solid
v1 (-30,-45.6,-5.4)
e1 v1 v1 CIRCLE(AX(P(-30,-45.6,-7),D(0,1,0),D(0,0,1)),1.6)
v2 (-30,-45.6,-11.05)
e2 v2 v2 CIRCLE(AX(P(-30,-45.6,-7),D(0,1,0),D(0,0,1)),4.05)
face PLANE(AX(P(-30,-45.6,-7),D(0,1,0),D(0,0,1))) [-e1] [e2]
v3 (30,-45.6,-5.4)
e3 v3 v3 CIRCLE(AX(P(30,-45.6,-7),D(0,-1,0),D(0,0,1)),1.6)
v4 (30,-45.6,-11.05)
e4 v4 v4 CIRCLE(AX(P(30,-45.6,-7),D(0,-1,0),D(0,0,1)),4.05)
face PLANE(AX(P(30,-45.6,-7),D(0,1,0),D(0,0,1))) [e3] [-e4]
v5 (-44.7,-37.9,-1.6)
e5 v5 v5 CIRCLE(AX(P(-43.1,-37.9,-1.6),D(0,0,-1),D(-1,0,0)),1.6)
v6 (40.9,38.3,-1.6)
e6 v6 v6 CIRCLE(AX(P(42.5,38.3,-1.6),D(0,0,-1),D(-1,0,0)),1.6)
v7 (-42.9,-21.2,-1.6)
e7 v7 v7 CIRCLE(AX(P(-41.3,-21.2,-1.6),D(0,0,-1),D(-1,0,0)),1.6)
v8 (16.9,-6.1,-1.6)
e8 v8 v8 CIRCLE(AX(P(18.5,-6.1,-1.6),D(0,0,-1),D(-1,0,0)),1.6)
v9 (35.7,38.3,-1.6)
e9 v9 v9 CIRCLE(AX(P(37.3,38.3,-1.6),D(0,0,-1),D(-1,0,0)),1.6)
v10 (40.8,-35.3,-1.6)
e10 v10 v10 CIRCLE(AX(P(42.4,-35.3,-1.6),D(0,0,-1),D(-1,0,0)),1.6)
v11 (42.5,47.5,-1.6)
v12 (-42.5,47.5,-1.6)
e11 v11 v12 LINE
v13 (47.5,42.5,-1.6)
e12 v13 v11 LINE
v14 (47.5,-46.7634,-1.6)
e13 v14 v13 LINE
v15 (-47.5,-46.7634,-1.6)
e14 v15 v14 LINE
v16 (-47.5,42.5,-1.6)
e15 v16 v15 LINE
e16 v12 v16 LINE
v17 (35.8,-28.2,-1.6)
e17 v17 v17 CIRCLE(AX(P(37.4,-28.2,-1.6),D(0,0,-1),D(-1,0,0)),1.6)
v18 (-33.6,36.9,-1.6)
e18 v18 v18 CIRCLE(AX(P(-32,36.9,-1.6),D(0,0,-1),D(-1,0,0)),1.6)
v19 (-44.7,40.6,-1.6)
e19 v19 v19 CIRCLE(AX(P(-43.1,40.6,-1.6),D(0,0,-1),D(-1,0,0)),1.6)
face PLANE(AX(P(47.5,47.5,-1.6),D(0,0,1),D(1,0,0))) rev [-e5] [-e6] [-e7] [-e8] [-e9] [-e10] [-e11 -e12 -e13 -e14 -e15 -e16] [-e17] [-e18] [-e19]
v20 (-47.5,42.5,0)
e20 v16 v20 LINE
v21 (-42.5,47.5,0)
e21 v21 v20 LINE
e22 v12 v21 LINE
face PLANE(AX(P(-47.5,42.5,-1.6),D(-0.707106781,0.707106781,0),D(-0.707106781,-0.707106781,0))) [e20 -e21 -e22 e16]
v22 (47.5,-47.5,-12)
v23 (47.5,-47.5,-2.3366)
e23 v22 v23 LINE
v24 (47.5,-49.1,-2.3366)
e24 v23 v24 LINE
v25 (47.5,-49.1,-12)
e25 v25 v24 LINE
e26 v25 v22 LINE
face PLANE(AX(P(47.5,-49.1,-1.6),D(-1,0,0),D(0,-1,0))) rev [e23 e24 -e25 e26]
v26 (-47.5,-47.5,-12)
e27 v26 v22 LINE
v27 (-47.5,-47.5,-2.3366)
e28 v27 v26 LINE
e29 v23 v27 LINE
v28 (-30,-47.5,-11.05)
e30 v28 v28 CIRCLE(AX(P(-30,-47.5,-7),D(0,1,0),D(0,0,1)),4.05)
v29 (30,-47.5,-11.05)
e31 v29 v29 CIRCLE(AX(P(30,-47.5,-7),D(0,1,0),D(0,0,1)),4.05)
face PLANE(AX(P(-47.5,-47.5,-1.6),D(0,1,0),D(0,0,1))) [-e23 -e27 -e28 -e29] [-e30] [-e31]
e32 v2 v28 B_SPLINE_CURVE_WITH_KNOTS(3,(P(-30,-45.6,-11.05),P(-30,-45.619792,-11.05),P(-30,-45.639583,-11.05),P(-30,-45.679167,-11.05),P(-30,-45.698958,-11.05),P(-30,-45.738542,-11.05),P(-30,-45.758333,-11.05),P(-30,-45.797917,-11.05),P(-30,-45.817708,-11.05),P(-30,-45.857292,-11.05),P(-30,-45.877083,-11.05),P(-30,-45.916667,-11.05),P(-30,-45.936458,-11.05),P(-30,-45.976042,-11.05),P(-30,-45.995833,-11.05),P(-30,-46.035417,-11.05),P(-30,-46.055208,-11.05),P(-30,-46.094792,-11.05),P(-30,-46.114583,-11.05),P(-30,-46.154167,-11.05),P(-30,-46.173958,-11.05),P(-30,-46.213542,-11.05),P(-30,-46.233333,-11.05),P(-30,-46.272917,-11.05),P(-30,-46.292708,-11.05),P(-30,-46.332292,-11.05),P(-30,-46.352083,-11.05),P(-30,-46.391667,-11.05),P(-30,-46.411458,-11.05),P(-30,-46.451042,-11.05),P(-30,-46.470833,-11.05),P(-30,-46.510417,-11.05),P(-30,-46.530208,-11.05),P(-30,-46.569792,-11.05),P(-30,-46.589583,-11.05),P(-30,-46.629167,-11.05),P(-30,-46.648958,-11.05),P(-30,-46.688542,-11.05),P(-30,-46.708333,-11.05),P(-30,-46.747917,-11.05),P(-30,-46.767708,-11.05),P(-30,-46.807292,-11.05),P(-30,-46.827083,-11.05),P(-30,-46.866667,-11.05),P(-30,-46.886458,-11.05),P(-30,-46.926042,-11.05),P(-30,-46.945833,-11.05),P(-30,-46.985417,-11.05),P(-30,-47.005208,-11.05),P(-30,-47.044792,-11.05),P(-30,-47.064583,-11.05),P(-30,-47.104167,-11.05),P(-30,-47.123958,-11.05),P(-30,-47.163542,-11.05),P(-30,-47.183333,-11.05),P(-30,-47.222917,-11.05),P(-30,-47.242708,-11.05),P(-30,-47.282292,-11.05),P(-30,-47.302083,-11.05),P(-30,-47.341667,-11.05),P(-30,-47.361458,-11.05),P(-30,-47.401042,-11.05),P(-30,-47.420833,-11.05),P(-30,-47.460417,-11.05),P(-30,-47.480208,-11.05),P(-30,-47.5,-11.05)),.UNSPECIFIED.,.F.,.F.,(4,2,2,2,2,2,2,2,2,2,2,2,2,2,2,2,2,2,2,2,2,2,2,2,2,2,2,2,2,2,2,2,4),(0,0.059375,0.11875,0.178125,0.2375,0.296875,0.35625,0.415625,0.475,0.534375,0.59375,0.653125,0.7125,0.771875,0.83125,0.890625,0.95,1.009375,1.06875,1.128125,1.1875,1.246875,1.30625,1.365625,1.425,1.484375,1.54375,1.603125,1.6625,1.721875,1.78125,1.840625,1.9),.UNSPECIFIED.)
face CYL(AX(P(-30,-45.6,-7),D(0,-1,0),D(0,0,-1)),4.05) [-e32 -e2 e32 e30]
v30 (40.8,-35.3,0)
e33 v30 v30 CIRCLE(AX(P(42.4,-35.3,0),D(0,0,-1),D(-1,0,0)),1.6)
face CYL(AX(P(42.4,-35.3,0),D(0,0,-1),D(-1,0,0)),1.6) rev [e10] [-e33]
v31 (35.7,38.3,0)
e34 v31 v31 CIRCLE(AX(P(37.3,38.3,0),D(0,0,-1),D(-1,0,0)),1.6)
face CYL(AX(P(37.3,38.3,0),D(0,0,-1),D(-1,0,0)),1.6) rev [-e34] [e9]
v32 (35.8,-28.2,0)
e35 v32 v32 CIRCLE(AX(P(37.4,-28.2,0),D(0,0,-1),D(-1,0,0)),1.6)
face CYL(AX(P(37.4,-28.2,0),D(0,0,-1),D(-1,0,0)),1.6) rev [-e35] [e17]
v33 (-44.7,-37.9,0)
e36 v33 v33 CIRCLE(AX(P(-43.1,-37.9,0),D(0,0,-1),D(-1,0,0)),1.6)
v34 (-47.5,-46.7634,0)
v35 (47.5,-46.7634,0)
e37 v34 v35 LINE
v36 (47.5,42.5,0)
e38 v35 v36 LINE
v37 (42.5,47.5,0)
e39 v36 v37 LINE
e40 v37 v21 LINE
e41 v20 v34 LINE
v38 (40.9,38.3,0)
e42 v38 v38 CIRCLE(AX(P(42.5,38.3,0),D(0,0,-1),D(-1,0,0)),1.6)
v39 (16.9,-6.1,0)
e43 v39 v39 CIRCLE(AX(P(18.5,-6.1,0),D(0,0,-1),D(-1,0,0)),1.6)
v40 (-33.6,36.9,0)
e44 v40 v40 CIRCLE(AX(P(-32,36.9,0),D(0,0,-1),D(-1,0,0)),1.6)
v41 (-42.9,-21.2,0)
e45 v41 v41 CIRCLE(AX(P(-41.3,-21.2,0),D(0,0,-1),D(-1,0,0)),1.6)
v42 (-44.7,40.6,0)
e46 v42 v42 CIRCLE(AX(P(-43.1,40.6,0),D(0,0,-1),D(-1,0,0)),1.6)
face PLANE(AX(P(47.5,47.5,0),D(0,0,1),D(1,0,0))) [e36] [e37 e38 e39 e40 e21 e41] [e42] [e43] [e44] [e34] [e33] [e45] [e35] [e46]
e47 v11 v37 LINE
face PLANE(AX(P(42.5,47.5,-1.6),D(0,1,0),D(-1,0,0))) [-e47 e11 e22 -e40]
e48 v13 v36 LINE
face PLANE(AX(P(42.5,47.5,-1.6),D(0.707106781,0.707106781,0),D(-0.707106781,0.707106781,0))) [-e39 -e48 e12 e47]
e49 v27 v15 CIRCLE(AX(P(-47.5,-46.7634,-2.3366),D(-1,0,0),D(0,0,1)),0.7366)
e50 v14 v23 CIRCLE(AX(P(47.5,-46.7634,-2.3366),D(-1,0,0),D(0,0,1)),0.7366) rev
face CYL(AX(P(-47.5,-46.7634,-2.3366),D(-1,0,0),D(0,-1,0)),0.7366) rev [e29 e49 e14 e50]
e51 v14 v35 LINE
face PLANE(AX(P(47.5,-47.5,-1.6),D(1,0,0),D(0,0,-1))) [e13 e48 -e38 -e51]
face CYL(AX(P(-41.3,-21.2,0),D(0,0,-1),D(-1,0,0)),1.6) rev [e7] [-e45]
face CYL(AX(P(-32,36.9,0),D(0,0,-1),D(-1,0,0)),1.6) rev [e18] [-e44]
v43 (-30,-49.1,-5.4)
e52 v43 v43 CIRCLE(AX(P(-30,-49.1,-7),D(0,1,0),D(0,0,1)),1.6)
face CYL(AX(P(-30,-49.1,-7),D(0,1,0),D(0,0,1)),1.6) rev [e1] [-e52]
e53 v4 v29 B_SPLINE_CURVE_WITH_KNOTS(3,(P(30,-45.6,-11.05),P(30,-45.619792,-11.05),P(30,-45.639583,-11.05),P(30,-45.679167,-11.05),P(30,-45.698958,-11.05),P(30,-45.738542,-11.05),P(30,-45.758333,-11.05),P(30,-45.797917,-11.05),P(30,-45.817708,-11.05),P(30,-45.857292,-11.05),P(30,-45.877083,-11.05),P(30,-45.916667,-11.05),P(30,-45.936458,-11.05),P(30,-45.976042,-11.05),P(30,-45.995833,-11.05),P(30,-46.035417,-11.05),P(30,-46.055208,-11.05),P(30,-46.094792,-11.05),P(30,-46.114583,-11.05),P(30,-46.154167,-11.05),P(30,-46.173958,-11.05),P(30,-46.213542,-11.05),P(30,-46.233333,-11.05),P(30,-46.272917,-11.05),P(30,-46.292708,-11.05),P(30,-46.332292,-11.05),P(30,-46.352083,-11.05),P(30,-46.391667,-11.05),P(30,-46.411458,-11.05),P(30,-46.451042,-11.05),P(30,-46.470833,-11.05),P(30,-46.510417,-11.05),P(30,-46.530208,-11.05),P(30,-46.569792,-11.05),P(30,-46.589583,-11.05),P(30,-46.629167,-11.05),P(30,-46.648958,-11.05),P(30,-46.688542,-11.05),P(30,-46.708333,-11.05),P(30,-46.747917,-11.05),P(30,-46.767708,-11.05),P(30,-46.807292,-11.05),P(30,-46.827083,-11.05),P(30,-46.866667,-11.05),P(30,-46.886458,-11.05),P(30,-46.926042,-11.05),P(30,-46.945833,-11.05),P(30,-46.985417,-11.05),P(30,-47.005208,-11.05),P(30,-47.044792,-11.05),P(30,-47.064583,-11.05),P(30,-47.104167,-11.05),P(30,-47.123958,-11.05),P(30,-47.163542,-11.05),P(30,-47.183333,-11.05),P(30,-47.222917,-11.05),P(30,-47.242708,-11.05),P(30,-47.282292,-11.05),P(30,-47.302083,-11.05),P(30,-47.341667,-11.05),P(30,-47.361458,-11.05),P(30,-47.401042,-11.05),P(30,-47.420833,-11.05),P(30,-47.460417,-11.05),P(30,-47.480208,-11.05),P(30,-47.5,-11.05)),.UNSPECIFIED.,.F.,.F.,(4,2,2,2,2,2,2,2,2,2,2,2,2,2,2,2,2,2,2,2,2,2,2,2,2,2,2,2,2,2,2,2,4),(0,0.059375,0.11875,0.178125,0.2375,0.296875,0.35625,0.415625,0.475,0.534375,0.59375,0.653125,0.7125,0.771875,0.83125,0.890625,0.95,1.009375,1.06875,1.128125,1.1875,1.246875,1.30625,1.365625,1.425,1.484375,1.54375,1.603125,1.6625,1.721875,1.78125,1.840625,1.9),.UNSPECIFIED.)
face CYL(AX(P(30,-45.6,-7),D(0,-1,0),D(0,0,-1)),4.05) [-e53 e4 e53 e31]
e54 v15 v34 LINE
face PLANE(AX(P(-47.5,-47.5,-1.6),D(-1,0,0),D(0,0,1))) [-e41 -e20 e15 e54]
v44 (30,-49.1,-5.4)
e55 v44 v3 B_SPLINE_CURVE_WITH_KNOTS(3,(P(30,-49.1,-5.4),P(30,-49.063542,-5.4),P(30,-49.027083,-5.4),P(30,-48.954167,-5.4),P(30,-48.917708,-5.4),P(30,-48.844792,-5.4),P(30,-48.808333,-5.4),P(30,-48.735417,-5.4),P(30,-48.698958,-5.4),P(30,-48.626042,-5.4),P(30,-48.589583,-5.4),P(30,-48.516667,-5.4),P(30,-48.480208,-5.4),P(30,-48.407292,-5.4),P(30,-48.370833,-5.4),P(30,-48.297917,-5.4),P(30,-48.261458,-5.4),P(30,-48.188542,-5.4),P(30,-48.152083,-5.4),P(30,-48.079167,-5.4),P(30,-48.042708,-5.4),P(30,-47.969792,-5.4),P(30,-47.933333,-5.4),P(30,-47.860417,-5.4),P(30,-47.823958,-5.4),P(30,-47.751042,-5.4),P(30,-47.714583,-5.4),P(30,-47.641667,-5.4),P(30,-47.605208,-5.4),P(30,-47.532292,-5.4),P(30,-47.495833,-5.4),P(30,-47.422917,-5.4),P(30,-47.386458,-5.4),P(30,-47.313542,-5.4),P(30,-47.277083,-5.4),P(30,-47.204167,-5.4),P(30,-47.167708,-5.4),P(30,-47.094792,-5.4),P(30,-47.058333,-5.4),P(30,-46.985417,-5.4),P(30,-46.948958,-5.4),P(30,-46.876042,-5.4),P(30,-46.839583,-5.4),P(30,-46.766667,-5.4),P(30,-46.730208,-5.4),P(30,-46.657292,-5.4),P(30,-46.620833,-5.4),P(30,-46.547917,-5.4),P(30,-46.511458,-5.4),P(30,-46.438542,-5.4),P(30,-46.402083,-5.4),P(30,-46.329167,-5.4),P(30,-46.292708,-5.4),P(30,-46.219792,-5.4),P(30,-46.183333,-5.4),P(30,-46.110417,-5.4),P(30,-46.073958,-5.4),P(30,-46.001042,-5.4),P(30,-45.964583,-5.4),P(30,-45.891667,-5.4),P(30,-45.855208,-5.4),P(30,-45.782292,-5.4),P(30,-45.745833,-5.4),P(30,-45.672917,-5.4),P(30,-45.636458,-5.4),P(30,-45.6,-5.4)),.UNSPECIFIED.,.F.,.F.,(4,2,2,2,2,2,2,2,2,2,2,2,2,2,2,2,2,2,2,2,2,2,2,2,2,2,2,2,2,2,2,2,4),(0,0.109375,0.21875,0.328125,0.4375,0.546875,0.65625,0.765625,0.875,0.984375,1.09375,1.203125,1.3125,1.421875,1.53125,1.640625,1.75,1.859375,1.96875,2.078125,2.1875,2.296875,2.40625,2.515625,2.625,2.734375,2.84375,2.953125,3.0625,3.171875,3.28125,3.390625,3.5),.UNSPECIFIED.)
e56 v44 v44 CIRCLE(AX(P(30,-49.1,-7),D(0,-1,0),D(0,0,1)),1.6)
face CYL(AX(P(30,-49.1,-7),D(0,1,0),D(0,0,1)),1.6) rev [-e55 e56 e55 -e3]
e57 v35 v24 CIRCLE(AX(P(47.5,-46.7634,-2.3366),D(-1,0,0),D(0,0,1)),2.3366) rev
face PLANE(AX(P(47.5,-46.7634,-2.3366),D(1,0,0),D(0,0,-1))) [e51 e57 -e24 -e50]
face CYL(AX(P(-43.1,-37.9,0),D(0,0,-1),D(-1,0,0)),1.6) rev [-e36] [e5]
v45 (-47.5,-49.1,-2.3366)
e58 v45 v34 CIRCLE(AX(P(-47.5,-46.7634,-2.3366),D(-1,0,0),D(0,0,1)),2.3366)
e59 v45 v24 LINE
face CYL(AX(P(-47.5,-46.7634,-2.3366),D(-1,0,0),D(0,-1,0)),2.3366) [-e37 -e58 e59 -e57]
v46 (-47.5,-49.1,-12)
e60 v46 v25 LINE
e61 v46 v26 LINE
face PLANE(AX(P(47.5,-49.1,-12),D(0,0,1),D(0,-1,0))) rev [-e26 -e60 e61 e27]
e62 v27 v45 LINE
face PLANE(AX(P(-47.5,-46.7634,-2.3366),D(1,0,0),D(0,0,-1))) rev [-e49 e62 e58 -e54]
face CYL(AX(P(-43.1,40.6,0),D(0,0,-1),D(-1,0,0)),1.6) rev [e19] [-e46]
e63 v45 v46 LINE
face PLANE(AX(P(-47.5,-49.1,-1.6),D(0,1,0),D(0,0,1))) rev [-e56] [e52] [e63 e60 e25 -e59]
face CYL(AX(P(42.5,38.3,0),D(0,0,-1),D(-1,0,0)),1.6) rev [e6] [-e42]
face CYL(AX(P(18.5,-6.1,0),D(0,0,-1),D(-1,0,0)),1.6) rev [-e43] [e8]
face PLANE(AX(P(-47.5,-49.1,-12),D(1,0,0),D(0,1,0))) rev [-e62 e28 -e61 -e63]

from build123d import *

# Parameters (mm, degrees)
SM_BASE_FLANGE_2_DEPTH           = 1.6
SM_EDGE_FLANGE_2_STRIP_W         = 7.8732
SM_EDGE_FLANGE_2_STRIP_H         = 1.6
SM_EDGE_FLANGE_2_STRIP_CUT_DEPTH = 95
SM_EDGE_FLANGE_2_DEPTH           = 95
SKETCH_16_R                      = 4.05
EXTRUDE_1_DEPTH                  = 1.9
SKETCH_17_R                      = 1.6
CUT_EXTRUDE_1_DEPTH              = 106.203897266
SKETCH_18_R                      = 1.6
CUT_EXTRUDE_2_DEPTH              = 70.102966651


# Sheet-metal steps are written as plain solids
with BuildPart() as part:
    # 草图1 → 基体-法兰2 (new body)
    with BuildSketch(Plane.XY):
        Polygon((-47.5, 42.5), (-42.5, 47.5), (42.5, 47.5), (47.5, 42.5), (47.5, -47.5), (-47.5, -47.5), align=None)
    extrude(amount=-SM_BASE_FLANGE_2_DEPTH)

    # 边线-法兰2 strip (across the edge) → 边线-法兰2 strip cut (cut)
    with BuildSketch(Plane(origin=(47.5, -47.5, -1.6), x_dir=(0, 1, 0), z_dir=(-1, 0, 0))):
        with Locations((-3.2, -0.8)):
            Rectangle(SM_EDGE_FLANGE_2_STRIP_W, SM_EDGE_FLANGE_2_STRIP_H)
    extrude(amount=SM_EDGE_FLANGE_2_STRIP_CUT_DEPTH, mode=Mode.SUBTRACT)

    # 边线-法兰2 section (across the edge) → 边线-法兰2 (add)
    with BuildSketch(Plane(origin=(47.5, -47.5, -1.6), x_dir=(0, 1, 0), z_dir=(-1, 0, 0))):
        with BuildLine():
            Line((-1.6, 0.7366), (-1.6, 10.4))
            Line((-1.6, 10.4), (0, 10.4))
            Line((0, 10.4), (0, 0.7366))
            ThreePointArc((0, 0.7366), (0.215745145, 0.215745145), (0.7366, 0))
            Line((0.7366, 0), (0.7366, -1.6))
            ThreePointArc((0.7366, -1.6), (-0.915625705, -0.915625705), (-1.6, 0.7366))
        make_face()
    extrude(amount=SM_EDGE_FLANGE_2_DEPTH)

    # 草图16 → 凸台-拉伸1 (add)
    with BuildSketch(Plane(origin=(0, -47.5, 0), x_dir=(1, 0, 0), z_dir=(0, 1, 0))):
        with Locations(Location((-30, 7, 0), (0, 0, 90))):
            Circle(SKETCH_16_R)
    extrude_1 = extrude(amount=EXTRUDE_1_DEPTH)

    # 草图17 → 切除-拉伸1 (cut, through all)
    with BuildSketch(Plane(origin=(0, -45.6, 0), x_dir=(1, 0, 0), z_dir=(0, 1, 0))):
        with Locations(Location((-30, 7, 0), (0, 0, 270))):
            Circle(SKETCH_17_R)
    cut_extrude_1 = extrude(amount=-CUT_EXTRUDE_1_DEPTH, mode=Mode.SUBTRACT)

    # 镜向1: 凸台-拉伸1, 切除-拉伸1 across plane
    add(extrude_1.mirror(Plane(origin=(0, 0, 0), x_dir=(0, 0, 1), z_dir=(1, 0, 0))))
    add(cut_extrude_1.mirror(Plane(origin=(0, 0, 0), x_dir=(0, 0, 1), z_dir=(1, 0, 0))), mode=Mode.SUBTRACT)

    # 草图18 → 切除-拉伸2 (cut, through all)
    with BuildSketch(Plane(origin=(0, 0, -1.6), x_dir=(-1, 0, 0), z_dir=(0, 0, -1))):
        with Locations((-42.5, 38.3)):
            Circle(SKETCH_18_R)
        with Locations((32, 36.9)):
            Circle(SKETCH_18_R)
        with Locations((43.1, 40.6)):
            Circle(SKETCH_18_R)
        with Locations((-18.5, -6.1)):
            Circle(SKETCH_18_R)
        with Locations((-37.4, -28.2)):
            Circle(SKETCH_18_R)
        with Locations((-42.4, -35.3)):
            Circle(SKETCH_18_R)
        with Locations((41.3, -21.2)):
            Circle(SKETCH_18_R)
        with Locations((43.1, -37.9)):
            Circle(SKETCH_18_R)
        with Locations((-37.3, 38.3)):
            Circle(SKETCH_18_R)
    extrude(amount=-CUT_EXTRUDE_2_DEPTH, mode=Mode.SUBTRACT)


solid = part.part
